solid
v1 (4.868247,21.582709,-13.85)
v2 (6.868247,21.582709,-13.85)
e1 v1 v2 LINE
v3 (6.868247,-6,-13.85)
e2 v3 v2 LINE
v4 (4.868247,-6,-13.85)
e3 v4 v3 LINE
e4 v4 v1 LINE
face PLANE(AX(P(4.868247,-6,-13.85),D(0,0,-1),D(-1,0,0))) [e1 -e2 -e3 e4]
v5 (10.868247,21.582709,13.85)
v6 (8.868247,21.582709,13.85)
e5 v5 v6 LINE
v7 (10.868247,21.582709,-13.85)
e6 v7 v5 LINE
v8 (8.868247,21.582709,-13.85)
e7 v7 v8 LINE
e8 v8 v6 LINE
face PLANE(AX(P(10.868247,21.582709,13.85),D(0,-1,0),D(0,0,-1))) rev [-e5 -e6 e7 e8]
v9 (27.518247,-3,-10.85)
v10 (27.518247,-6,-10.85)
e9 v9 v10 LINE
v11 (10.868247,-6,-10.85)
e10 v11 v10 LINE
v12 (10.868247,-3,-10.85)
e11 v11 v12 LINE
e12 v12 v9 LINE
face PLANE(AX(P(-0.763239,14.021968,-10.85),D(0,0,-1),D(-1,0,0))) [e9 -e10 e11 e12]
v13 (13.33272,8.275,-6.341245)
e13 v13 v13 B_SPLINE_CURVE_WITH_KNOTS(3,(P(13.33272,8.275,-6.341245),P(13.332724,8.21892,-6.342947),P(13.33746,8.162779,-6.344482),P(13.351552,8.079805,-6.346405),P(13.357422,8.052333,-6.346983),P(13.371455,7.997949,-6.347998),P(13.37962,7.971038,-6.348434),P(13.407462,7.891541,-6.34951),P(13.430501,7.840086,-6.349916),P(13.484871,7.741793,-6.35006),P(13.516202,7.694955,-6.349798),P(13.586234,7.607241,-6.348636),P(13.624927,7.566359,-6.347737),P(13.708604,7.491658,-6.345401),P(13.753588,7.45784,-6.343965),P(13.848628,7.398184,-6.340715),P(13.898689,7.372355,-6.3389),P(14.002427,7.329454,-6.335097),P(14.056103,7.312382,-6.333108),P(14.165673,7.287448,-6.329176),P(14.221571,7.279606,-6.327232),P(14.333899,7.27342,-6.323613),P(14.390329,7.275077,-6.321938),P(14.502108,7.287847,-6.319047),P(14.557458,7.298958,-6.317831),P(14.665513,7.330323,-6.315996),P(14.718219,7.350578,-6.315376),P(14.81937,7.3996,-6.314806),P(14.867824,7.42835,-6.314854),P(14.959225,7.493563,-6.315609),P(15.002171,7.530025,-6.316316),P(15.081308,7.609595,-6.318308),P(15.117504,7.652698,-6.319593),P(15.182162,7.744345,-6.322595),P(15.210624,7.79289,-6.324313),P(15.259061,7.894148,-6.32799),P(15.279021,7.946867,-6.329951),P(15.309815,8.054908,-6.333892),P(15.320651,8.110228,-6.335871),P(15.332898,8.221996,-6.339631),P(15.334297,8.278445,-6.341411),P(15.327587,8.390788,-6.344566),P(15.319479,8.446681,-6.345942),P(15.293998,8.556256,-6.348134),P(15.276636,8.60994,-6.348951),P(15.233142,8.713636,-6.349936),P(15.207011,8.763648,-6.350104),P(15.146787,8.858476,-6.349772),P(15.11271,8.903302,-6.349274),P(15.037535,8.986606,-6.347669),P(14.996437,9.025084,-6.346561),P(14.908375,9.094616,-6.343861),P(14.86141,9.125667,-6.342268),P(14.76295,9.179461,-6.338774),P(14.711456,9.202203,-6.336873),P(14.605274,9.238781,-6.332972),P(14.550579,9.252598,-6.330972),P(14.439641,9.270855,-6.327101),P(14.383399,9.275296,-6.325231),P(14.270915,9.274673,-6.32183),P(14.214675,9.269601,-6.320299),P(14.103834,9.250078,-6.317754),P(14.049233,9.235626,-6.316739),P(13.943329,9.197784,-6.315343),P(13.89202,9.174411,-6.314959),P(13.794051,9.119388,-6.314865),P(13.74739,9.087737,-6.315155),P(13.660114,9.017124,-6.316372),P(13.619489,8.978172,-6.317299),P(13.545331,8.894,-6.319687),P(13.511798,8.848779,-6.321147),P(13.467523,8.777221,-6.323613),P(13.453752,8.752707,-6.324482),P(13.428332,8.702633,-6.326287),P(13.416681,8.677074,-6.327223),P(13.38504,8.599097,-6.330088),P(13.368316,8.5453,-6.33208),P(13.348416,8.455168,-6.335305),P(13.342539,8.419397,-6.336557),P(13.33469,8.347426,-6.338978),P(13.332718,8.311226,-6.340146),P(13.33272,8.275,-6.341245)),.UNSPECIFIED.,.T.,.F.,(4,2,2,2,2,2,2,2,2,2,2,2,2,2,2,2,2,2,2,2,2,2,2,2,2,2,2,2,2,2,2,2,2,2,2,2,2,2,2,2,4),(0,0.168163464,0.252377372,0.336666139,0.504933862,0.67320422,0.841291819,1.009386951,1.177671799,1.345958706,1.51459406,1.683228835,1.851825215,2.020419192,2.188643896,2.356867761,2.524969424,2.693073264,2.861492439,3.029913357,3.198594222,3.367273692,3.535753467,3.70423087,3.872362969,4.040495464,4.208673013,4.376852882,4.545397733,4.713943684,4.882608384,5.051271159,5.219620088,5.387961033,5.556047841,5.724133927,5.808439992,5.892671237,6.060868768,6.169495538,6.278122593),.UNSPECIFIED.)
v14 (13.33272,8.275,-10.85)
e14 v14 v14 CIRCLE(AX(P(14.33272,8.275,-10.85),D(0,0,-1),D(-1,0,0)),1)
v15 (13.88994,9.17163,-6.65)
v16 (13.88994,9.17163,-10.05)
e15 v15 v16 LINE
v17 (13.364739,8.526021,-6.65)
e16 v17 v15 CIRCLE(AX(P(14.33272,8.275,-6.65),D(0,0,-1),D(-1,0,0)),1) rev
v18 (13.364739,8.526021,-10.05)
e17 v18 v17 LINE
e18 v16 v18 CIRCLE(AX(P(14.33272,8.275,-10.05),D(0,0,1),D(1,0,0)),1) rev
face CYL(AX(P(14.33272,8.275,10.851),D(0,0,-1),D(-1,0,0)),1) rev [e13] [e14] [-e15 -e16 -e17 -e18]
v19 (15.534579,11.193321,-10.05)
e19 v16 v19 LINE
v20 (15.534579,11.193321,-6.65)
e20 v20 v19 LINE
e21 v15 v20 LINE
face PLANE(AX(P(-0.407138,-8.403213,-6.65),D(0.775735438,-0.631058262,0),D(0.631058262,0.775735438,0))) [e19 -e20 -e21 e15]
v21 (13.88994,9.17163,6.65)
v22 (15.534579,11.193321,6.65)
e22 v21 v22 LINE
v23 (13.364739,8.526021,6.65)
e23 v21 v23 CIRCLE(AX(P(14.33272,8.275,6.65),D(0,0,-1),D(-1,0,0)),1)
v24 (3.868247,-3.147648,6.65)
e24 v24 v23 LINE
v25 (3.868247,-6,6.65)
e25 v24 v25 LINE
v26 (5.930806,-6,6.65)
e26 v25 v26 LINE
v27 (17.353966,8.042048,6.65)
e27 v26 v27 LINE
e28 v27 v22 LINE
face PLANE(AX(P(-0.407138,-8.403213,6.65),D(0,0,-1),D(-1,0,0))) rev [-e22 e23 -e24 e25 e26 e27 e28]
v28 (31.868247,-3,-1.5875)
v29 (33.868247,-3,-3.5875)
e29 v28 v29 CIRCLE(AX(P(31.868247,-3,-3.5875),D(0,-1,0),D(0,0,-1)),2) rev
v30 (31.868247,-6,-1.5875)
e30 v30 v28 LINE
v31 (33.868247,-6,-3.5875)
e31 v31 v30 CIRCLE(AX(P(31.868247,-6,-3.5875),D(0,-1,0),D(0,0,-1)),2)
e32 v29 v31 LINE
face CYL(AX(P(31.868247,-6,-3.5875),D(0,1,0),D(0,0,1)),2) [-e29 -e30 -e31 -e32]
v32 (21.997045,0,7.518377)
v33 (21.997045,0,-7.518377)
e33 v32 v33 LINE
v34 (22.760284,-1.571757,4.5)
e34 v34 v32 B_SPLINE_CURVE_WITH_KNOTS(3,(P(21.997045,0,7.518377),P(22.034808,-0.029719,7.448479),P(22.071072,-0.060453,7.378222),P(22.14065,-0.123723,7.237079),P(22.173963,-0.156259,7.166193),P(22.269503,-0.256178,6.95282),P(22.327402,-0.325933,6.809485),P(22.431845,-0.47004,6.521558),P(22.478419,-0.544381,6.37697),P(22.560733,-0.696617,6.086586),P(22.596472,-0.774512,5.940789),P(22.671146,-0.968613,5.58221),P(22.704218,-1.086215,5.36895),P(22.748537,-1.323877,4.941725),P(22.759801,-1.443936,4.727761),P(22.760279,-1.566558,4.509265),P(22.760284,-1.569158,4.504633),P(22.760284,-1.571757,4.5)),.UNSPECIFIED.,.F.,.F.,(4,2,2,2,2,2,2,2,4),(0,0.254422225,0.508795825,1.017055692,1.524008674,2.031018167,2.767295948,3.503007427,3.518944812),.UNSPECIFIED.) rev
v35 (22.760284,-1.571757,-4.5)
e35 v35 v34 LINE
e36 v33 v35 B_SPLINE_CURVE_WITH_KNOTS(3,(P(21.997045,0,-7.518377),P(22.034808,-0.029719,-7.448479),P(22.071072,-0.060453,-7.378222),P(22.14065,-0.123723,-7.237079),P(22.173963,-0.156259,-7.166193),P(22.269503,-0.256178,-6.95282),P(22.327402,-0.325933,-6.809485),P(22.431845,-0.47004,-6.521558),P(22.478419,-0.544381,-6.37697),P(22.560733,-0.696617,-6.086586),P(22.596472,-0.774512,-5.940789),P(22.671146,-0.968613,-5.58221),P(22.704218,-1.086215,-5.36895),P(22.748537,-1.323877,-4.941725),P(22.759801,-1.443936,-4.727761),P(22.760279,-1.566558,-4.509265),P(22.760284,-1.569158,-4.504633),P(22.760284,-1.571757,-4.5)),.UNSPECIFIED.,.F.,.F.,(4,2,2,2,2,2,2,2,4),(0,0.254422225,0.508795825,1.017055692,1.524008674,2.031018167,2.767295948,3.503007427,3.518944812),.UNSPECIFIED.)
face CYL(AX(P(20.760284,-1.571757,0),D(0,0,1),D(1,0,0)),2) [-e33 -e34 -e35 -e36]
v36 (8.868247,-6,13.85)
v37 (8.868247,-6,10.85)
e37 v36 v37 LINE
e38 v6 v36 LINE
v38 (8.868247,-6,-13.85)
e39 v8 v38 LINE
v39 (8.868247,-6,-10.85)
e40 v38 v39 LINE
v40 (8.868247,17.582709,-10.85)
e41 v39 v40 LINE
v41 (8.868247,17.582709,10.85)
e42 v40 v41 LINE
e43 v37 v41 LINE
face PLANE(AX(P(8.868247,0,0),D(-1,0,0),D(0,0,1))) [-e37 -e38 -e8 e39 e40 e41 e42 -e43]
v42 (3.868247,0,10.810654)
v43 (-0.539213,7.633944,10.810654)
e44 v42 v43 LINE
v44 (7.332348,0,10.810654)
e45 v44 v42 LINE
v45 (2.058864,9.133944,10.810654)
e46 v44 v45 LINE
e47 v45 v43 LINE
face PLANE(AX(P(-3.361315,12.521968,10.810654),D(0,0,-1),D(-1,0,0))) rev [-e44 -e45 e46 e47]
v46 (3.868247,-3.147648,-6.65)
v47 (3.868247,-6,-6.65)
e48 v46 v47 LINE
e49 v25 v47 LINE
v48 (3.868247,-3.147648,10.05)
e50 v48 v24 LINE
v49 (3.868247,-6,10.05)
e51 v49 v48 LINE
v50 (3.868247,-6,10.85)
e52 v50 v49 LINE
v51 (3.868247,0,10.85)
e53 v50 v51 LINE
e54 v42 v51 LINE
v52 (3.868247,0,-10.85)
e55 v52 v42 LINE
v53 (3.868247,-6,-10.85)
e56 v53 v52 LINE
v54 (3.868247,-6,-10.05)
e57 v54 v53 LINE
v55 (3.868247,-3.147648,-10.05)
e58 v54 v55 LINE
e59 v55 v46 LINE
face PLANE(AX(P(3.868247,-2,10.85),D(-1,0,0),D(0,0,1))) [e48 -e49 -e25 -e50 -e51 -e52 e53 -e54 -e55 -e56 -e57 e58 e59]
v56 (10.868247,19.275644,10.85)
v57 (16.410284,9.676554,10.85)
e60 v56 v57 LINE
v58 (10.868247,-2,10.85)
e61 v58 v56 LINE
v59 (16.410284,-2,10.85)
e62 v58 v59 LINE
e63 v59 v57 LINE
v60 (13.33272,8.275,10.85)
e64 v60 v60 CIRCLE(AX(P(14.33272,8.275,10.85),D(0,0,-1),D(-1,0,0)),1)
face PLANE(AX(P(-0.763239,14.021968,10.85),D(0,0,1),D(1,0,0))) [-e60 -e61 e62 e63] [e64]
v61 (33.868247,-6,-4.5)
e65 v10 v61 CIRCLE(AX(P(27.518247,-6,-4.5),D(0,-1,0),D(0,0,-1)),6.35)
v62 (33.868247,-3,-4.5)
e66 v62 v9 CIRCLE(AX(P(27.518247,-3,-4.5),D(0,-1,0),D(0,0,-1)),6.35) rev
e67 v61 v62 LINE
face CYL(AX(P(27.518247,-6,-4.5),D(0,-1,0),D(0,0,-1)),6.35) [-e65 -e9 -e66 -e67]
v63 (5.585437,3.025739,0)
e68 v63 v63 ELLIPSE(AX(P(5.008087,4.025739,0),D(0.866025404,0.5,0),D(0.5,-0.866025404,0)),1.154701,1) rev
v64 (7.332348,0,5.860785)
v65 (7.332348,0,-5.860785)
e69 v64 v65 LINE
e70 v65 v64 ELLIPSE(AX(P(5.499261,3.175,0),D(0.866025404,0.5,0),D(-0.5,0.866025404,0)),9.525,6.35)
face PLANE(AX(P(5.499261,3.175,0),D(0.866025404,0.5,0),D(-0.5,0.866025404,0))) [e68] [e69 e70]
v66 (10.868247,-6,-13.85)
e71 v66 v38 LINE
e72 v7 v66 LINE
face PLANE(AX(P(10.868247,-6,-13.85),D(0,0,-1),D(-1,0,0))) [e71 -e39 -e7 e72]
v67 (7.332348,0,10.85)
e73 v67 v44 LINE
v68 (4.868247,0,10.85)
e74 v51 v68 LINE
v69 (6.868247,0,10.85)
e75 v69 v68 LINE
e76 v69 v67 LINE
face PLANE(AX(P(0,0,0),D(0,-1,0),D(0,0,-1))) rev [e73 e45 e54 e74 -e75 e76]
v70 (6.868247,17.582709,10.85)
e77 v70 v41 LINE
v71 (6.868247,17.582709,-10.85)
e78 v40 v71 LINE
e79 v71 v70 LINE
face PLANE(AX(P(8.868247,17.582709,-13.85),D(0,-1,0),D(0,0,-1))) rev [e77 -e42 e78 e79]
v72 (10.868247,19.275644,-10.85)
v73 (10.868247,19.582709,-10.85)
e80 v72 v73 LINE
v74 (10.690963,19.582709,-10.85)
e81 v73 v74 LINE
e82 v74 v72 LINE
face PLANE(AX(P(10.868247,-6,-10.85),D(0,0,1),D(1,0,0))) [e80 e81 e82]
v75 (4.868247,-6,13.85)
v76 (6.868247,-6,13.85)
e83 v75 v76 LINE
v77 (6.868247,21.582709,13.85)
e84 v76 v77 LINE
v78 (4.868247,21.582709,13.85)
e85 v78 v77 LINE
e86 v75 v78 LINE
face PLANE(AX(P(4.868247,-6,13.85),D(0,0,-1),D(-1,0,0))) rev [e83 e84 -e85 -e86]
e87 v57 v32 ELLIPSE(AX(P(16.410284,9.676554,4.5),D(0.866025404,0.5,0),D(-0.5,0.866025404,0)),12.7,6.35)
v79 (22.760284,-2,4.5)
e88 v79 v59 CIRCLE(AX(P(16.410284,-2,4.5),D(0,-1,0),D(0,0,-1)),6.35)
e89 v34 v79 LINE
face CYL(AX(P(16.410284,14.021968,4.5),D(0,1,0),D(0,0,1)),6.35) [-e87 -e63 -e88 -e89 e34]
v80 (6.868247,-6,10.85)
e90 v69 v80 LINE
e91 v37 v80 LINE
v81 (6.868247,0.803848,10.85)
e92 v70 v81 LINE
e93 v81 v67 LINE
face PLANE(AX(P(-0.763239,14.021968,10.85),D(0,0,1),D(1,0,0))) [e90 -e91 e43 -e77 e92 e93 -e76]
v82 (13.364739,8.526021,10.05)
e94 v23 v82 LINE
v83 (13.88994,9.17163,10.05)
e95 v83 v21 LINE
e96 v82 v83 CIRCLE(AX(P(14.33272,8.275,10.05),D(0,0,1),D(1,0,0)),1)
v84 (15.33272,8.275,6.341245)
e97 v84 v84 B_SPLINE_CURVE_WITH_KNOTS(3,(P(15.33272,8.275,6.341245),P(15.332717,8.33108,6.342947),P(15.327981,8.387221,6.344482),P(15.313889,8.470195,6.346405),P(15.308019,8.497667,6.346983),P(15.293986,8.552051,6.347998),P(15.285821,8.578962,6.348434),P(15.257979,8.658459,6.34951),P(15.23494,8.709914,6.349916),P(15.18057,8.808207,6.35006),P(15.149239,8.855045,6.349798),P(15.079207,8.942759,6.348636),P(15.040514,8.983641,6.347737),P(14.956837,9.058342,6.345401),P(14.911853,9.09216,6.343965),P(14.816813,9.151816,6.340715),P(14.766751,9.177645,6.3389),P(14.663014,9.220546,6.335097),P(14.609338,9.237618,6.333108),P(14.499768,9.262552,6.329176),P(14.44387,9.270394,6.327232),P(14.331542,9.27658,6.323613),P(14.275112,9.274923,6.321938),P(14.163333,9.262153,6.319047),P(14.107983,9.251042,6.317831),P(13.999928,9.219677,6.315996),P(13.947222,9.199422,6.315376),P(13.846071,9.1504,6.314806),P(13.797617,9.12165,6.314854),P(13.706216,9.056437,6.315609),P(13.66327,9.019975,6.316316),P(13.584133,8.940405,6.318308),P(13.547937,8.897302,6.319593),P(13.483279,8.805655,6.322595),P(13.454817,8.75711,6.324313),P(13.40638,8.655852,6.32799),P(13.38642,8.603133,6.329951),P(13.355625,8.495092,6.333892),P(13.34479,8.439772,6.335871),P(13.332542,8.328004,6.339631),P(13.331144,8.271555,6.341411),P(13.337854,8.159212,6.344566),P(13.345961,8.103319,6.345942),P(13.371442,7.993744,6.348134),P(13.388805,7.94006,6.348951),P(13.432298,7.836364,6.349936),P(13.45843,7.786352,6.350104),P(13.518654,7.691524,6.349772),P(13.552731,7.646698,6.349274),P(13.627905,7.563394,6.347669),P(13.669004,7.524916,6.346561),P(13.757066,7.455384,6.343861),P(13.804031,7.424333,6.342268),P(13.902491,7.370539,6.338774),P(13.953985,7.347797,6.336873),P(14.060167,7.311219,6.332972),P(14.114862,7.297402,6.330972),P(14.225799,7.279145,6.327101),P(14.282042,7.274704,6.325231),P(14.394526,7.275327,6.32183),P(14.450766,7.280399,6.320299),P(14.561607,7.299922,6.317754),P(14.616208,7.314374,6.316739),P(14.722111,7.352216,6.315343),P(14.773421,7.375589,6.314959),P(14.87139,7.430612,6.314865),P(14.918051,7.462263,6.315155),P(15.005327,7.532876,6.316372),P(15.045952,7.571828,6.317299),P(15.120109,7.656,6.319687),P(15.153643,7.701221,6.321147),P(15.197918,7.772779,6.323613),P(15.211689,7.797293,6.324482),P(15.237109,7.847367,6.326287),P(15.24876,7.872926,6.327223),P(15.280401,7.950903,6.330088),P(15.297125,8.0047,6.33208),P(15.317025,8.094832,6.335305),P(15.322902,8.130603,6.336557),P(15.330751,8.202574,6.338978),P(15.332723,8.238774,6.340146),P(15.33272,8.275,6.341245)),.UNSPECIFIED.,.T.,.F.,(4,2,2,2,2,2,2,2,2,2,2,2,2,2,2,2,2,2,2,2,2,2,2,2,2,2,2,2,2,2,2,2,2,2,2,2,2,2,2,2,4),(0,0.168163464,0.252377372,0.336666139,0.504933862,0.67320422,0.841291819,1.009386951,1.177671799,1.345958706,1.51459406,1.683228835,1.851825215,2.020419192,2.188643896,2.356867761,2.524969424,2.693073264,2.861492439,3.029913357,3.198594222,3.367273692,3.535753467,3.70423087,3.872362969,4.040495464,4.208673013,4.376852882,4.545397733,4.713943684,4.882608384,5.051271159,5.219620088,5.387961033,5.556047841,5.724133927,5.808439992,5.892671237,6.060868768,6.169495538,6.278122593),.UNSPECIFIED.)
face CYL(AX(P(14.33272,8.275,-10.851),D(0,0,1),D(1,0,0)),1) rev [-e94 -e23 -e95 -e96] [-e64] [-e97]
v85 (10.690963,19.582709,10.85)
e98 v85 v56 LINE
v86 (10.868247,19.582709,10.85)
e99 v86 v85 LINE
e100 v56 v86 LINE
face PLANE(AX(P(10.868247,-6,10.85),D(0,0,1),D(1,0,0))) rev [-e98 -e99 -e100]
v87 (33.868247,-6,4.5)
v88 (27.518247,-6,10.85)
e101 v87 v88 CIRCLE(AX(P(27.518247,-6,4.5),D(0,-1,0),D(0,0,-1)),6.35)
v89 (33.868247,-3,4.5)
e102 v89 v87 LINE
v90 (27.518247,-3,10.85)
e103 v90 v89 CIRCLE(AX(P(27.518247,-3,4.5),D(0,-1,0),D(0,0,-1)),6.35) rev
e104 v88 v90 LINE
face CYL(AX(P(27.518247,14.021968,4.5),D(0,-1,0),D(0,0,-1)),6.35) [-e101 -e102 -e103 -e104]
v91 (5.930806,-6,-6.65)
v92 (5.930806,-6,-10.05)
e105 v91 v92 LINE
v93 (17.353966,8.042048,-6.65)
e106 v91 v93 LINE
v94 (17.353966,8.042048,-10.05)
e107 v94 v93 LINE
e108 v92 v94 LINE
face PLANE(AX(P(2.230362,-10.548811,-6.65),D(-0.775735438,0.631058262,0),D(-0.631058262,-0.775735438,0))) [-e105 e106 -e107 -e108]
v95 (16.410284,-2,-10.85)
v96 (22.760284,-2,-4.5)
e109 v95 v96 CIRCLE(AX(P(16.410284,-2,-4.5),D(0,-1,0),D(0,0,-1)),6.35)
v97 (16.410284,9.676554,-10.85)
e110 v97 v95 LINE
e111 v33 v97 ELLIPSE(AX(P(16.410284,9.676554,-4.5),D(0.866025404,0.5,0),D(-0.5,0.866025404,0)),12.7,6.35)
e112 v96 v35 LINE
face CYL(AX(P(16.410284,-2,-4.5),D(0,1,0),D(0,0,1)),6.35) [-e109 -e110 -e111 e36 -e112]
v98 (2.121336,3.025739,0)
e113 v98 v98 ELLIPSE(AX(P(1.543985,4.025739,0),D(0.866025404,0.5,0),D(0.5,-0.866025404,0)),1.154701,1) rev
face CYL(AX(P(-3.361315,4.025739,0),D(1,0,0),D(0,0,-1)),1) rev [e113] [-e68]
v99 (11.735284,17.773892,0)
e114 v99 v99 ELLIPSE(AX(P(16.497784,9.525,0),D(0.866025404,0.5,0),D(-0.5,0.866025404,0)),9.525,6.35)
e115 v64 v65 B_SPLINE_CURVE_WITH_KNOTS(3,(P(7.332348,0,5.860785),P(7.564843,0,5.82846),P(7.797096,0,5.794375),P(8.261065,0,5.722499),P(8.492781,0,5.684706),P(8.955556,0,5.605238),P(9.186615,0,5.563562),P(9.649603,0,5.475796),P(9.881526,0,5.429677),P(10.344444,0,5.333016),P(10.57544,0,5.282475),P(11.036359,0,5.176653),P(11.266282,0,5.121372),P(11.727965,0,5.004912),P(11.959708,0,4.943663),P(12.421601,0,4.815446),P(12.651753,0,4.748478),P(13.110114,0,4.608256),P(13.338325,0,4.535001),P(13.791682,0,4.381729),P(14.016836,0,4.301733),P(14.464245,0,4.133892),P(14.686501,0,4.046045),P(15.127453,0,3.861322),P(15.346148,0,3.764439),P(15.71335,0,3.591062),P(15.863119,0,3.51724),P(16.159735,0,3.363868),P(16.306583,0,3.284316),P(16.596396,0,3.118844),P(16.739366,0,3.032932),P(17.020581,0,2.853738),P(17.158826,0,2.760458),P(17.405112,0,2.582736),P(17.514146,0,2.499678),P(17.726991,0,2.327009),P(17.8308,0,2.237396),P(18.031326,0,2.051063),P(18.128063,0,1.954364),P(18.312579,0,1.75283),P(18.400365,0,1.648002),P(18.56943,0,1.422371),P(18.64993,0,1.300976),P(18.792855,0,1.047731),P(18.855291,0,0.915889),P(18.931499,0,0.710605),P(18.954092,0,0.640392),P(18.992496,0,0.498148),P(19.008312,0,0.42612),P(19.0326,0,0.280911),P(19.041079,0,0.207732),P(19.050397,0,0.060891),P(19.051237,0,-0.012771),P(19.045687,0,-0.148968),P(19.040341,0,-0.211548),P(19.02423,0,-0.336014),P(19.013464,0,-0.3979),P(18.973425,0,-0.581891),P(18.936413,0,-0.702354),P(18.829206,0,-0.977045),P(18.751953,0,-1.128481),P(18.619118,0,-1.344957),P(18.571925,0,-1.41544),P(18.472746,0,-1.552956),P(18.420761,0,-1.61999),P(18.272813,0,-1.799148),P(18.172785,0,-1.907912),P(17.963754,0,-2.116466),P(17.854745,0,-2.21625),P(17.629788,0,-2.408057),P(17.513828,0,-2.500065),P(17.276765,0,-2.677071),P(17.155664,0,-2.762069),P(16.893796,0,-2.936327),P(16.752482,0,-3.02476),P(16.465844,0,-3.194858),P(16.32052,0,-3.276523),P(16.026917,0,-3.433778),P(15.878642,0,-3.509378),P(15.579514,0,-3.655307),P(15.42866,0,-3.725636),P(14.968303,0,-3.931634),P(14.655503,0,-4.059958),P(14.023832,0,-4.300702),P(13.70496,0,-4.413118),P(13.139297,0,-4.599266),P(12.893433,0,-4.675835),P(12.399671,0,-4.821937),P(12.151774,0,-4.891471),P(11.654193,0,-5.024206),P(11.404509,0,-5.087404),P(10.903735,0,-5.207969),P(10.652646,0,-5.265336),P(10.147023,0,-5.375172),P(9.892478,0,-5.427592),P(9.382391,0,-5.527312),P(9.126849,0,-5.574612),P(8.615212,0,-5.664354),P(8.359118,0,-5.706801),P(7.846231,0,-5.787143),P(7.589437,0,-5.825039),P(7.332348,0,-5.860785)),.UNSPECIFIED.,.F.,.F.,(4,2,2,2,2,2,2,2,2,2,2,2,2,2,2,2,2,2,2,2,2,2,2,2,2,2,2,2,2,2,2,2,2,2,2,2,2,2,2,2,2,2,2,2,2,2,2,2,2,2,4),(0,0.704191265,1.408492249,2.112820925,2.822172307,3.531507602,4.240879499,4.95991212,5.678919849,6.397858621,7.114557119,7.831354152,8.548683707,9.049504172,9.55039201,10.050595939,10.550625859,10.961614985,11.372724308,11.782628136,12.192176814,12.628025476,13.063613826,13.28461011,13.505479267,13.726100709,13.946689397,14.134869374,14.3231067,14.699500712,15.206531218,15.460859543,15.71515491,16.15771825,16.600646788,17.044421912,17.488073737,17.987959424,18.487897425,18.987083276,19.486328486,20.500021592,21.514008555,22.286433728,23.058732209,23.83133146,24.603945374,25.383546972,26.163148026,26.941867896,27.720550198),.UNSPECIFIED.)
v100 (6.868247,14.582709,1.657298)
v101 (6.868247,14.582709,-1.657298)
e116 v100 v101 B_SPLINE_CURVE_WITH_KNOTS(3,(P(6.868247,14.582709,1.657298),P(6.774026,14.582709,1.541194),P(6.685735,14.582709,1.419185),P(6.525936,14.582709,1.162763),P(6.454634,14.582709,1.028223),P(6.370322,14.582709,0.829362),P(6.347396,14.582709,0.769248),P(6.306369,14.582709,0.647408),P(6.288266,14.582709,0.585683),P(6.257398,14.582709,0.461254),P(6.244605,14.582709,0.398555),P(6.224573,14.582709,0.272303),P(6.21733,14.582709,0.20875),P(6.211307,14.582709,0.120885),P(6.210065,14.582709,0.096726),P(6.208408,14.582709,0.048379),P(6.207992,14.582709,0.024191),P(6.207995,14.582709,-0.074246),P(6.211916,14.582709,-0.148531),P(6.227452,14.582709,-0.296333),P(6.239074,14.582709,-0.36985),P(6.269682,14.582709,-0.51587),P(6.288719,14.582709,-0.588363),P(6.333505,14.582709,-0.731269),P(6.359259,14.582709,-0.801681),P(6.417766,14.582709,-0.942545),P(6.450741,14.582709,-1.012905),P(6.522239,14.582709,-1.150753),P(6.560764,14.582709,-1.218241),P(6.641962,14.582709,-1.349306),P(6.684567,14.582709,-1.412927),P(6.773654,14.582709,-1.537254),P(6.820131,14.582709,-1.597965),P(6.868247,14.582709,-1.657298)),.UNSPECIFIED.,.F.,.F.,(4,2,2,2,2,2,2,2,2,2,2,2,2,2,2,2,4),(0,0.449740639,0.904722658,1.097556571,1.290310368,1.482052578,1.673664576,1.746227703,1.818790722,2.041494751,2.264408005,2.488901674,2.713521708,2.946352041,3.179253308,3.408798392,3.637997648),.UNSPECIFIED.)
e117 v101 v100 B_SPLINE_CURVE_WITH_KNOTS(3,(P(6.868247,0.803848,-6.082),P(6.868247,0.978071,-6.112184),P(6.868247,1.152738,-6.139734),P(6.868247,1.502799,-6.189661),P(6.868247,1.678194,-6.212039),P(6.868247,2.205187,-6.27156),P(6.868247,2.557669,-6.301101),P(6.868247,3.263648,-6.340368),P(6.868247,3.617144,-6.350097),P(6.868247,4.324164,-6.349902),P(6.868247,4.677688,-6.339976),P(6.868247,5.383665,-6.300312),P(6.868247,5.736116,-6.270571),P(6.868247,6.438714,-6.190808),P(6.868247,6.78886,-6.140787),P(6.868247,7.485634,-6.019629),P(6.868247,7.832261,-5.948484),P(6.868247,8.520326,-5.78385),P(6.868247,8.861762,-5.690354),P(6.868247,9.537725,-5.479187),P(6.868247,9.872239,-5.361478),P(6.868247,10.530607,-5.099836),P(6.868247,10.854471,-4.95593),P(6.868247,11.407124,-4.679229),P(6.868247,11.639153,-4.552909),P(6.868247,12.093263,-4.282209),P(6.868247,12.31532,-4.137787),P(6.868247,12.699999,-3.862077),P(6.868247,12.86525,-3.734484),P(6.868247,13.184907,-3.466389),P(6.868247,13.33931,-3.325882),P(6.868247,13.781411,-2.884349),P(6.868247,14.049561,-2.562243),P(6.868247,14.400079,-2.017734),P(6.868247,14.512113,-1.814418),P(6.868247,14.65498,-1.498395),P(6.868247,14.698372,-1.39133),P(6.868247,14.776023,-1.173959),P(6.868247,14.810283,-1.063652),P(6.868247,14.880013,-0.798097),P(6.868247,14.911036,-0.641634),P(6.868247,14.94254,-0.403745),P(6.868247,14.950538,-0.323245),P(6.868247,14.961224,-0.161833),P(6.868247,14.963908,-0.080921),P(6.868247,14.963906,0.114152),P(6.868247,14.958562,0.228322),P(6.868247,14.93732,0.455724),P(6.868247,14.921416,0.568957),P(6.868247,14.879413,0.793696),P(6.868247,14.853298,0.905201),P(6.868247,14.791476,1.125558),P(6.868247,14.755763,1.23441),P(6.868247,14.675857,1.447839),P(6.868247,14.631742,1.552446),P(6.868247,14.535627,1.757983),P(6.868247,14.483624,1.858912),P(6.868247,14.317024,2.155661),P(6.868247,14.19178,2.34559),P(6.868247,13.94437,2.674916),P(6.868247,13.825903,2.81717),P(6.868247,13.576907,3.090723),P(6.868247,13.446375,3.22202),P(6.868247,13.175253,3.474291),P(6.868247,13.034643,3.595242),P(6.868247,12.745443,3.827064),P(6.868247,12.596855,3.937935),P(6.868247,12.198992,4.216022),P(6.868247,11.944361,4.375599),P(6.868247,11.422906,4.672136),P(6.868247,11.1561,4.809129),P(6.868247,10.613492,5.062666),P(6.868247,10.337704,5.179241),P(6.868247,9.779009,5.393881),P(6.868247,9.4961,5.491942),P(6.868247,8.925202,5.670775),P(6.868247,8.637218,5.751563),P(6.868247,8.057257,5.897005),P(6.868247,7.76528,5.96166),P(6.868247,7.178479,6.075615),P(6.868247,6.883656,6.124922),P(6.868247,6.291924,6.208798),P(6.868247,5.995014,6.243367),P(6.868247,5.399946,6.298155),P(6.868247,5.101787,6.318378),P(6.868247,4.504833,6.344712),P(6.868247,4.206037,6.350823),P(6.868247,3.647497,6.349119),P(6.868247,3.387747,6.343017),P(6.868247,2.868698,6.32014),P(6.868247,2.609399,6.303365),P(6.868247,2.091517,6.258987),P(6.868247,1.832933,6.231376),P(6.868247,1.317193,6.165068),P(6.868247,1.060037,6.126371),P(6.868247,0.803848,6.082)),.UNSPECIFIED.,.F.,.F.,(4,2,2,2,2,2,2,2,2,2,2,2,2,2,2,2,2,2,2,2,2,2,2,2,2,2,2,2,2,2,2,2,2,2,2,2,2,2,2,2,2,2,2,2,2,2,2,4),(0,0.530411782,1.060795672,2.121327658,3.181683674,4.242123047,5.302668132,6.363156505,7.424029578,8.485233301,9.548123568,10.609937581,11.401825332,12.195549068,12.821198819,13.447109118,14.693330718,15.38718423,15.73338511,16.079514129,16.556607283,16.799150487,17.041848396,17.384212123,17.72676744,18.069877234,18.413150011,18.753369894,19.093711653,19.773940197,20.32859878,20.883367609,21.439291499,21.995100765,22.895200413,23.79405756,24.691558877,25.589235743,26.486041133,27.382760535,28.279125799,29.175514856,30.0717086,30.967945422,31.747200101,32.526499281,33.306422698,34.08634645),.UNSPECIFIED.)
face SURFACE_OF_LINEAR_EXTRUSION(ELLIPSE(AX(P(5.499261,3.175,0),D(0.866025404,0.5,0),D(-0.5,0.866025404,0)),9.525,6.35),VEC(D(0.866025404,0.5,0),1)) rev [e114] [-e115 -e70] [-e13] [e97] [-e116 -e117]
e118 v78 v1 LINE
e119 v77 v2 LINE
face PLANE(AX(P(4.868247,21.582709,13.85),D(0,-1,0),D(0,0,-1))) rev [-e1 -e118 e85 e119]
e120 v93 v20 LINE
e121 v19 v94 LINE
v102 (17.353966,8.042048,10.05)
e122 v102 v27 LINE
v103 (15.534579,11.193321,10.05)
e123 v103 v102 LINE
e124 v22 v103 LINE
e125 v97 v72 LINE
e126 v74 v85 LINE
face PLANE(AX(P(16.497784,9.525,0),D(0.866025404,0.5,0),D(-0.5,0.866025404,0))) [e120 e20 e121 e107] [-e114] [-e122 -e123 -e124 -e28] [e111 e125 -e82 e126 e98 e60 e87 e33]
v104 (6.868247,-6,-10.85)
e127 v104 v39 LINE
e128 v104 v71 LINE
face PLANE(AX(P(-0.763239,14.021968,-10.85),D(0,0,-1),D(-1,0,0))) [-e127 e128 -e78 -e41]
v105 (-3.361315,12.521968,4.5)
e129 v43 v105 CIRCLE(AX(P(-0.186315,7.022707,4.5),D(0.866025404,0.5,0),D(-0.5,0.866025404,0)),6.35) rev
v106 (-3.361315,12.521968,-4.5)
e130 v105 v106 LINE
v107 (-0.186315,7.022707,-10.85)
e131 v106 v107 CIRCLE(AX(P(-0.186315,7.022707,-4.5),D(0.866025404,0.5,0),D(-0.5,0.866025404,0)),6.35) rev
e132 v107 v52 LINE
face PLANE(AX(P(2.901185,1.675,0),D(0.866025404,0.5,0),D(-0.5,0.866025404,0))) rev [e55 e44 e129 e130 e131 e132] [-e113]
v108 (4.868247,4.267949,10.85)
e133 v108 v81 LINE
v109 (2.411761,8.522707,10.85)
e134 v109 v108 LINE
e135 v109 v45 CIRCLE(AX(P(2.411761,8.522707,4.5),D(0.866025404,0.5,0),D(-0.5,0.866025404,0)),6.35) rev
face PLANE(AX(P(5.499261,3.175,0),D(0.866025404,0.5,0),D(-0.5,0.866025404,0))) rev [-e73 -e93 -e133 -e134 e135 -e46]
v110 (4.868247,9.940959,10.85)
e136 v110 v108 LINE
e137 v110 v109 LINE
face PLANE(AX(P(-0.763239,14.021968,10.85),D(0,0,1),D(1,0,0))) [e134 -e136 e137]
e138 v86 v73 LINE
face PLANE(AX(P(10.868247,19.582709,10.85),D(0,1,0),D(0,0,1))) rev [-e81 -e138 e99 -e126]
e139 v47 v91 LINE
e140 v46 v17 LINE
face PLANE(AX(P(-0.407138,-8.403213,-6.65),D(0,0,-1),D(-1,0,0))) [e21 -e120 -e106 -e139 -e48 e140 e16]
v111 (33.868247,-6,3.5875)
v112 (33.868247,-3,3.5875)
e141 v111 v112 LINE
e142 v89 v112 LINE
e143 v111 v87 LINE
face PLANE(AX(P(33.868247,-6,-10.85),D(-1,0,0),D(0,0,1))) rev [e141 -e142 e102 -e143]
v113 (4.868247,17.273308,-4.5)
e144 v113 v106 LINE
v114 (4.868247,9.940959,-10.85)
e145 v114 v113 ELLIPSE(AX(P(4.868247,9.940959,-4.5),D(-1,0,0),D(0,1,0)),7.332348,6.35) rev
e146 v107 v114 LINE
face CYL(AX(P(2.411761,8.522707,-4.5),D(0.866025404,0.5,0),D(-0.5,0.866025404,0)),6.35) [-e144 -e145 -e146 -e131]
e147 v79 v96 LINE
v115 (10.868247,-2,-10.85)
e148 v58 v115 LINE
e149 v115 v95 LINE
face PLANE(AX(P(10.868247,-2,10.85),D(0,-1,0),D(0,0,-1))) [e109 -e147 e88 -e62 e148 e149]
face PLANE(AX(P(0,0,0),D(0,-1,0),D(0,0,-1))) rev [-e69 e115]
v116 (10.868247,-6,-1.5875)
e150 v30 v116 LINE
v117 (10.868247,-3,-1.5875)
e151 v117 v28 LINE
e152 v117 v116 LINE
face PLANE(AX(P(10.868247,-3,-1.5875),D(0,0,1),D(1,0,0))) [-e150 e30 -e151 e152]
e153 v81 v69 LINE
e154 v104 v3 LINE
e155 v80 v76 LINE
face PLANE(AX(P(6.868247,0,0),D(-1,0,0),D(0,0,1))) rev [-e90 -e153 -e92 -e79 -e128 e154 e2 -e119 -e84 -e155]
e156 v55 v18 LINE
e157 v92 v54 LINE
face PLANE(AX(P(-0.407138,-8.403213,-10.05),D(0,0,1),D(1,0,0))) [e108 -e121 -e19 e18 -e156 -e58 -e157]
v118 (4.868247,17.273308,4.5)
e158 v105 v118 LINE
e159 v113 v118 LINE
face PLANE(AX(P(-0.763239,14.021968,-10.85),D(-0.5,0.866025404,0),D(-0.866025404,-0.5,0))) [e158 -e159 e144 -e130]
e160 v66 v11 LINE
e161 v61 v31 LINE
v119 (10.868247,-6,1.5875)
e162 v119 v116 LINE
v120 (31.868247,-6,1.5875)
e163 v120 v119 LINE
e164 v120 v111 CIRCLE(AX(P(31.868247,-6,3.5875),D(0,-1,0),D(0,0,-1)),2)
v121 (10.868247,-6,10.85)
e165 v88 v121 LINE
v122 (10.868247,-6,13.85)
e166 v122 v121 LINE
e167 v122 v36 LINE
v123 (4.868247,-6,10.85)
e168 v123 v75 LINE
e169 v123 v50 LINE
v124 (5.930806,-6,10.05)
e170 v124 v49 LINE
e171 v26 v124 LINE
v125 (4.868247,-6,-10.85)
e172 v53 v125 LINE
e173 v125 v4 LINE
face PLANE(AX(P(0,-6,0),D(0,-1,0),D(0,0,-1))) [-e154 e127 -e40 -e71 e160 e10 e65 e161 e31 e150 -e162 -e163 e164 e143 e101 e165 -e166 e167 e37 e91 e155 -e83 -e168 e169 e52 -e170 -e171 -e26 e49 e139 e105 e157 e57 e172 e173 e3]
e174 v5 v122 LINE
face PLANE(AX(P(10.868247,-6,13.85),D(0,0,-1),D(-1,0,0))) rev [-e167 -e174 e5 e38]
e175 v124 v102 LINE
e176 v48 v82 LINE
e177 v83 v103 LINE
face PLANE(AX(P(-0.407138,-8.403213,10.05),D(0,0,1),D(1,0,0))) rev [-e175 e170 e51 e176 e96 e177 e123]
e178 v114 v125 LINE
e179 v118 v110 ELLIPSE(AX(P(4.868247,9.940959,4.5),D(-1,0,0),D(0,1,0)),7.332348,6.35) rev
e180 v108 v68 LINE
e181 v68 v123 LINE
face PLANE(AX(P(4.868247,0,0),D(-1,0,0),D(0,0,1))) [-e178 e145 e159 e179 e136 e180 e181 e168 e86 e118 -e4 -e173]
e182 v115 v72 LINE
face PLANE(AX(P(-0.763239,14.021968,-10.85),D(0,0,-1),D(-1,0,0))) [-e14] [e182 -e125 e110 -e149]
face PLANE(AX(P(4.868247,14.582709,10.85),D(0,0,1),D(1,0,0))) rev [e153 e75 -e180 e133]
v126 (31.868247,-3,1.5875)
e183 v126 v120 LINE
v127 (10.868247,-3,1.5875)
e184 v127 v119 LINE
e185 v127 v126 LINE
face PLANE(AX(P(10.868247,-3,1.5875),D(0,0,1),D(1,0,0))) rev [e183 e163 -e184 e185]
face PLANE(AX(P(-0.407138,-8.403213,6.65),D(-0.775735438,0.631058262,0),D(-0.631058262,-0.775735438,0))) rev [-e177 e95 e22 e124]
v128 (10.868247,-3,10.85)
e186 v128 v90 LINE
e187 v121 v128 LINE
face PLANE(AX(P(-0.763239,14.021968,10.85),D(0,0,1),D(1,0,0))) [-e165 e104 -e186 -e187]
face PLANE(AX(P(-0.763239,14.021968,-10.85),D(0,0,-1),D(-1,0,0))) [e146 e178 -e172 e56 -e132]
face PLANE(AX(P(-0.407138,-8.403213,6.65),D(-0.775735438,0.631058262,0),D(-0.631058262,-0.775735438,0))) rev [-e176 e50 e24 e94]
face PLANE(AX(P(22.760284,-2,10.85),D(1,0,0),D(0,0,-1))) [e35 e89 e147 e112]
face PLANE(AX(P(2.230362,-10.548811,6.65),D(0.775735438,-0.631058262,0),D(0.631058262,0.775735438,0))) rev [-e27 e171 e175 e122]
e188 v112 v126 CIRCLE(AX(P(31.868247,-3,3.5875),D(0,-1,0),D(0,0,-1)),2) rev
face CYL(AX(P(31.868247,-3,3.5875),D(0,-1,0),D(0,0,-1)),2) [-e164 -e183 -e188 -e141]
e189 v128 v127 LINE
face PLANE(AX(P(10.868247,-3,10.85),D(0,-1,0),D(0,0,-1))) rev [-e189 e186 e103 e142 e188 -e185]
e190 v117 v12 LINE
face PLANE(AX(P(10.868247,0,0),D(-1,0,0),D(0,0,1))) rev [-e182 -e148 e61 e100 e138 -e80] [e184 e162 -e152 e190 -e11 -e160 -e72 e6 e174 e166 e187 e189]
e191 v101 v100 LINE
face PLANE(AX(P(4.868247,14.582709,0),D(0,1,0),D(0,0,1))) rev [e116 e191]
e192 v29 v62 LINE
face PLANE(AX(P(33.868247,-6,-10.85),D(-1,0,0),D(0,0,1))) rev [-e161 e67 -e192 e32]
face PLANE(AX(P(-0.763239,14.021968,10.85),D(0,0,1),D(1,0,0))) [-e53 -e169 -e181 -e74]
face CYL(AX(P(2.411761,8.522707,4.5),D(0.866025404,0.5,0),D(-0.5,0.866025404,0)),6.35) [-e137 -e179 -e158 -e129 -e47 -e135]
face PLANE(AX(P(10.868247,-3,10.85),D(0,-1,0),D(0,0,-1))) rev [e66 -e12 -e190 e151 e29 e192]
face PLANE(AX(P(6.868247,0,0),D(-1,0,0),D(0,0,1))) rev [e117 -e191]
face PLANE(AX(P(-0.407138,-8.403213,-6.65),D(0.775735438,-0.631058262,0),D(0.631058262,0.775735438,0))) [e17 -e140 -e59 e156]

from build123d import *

# Parameters (mm, degrees)
SKETCH2_W           = 21.7
SKETCH2_H           = 25.05
SKETCH2_RX          = 9.525
SKETCH2_RY          = 6.35
BOSS_EXTRUDE1_DEPTH = 12.7
SKETCH3_W           = 21.660653916
SKETCH3_H           = 25.05
BOSS_EXTRUDE2_DEPTH = 3
SKETCH5_W           = 18.892037138
SKETCH5_H           = 21.7
BOSS_EXTRUDE3_DEPTH = 2
SKETCH6_W           = 30
SKETCH6_H           = 21.7
BOSS_EXTRUDE4_DEPTH = 4
SKETCH7_W           = 21.7
SKETCH7_H           = 1
SKETCH7_W_2         = 3.175
SKETCH7_H_2         = 3
CUT_EXTRUDE2_DEPTH  = 23
SKETCH7_3_W         = 21.7
SKETCH7_3_H         = 7.272473706
CUT_EXTRUDE3_DEPTH  = 44.803879418
SKETCH11_R          = 1
CUT_EXTRUDE8_DEPTH  = 33.487034031
CUT_EXTRUDE4_REACH  = 47.088
SKETCH9_R           = 1
SKETCH15_W          = 3.4
SKETCH15_H          = 3.4
CUT_EXTRUDE9_DEPTH  = 28.443249332
BOSS_EXTRUDE5_DEPTH = 2
BOSS_EXTRUDE6_DEPTH = 2
FILLET5_R           = 6.35
FILLET6_R           = 2
FILLET7_R           = 2
SKETCH19_W          = 2
SKETCH19_H          = 4
CUT_EXTRUDE10_DEPTH = 48.148292291


with BuildPart() as part:
    # Sketch2 → Boss-Extrude1 (new body)
    with BuildSketch(Plane(origin=(16.497783942, 9.525, 0), x_dir=(0, 0, -1), z_dir=(0.8660254037844379, 0.5000000000000013, 0))):
        Rectangle(SKETCH2_W, SKETCH2_H)
        with Locations(Location((0, 0), (0, 0, 90))):
            Ellipse(SKETCH2_RX, SKETCH2_RY, mode=Mode.SUBTRACT)
    extrude(amount=-BOSS_EXTRUDE1_DEPTH)

    # Sketch3 → Boss-Extrude2 (add)
    with BuildSketch(Plane(origin=(5.499261314, 3.175, 0), x_dir=(0, 0, 1), z_dir=(-0.8660254037844379, -0.5000000000000014, 0))):
        with Locations((-0.019673042, 0)):
            Rectangle(SKETCH3_W, SKETCH3_H)
    extrude(amount=BOSS_EXTRUDE2_DEPTH)

    # Sketch5 → Boss-Extrude3 (add)
    with BuildSketch(Plane(origin=(0, 0, 0), x_dir=(-1, 0, 0), z_dir=(0, 1, 0))):
        with Locations((-13.314265373, 0)):
            Rectangle(SKETCH5_W, SKETCH5_H)
    extrude(amount=-BOSS_EXTRUDE3_DEPTH)

    # Sketch6 → Boss-Extrude4 (add)
    with BuildSketch(Plane.XZ.offset(2)):
        with Locations((18.868246804, 0)):
            Rectangle(SKETCH6_W, SKETCH6_H)
    extrude(amount=BOSS_EXTRUDE4_DEPTH)

    # Sketch7 → Cut-Extrude2 (cut)
    with BuildSketch(Plane(origin=(33.868246804, 0, 0), x_dir=(0, 0, -1), z_dir=(1, 0, 0))):
        with Locations((0, -2.5)):
            Rectangle(SKETCH7_W, SKETCH7_H)
        with Locations((0, -4.5)):
            Rectangle(SKETCH7_W_2, SKETCH7_H_2)
    extrude(amount=-CUT_EXTRUDE2_DEPTH, mode=Mode.SUBTRACT)

    # Sketch7<3> → Cut-Extrude3 (cut, through all)
    with BuildSketch(Plane(origin=(33.868246804, 0, 0), x_dir=(0, 0, -1), z_dir=(1, 0, 0))):
        with Locations((0, -9.636236853)):
            Rectangle(SKETCH7_3_W, SKETCH7_3_H)
    extrude(amount=-CUT_EXTRUDE3_DEPTH, mode=Mode.SUBTRACT)

    # Sketch11 → Cut-Extrude8 (cut, through all)
    with BuildSketch(Plane(origin=(19.672783942, 0.194872981, 0), x_dir=(0, 0, -1), z_dir=(-1, 0, 0))):
        with Locations(Location((0, -3.830865705, 0), (0, 0, 90))):
            Circle(SKETCH11_R)
    extrude(amount=CUT_EXTRUDE8_DEPTH, mode=Mode.SUBTRACT)

    # Sketch9 → Cut-Extrude4 (cut, up to next)
    with BuildSketch(Plane(origin=(0, 0, -10.85), x_dir=(-1, 0, 0), z_dir=(0, 0, -1)), mode=Mode.PRIVATE) as cut_extrude4_sk1:
        with Locations((-14.332720433, 8.275)):
            Circle(SKETCH9_R)
    cut_extrude4_tool1 = extrude(cut_extrude4_sk1.sketch, amount=-CUT_EXTRUDE4_REACH, mode=Mode.PRIVATE) & part.part
    cut_extrude4 = cut_extrude4_tool1.solids().sort_by_distance((14.33272, 8.275, -10.85))[0]
    add(cut_extrude4, mode=Mode.SUBTRACT)

    # Sketch15 → Cut-Extrude9 (cut, symmetric)
    with BuildSketch(Plane(origin=(16.497783942, 9.525, 0), x_dir=(0.7757354378747654, -0.6310582623064579, 0), z_dir=(0.6310582623064579, 0.7757354378747654, 0))):
        with Locations((-0.1, -8.35)):
            Rectangle(SKETCH15_W, SKETCH15_H)
    cut_extrude9 = extrude(amount=CUT_EXTRUDE9_DEPTH, both=True, mode=Mode.SUBTRACT)

    # Sketch16 → Boss-Extrude5 (add)
    with BuildSketch(Plane(origin=(8.868246804, 0, 0), x_dir=(0, 0, -1), z_dir=(1, 0, 0))):
        Polygon((-10.85, -6), (-10.85, 19.582708922), (0, 19.582708922), (0, 21.582708922), (-13.85, 21.582708922), (-13.85, -6), align=None)
    boss_extrude5 = extrude(amount=BOSS_EXTRUDE5_DEPTH)

    # Sketch18 → Boss-Extrude6 (add)
    with BuildSketch(Plane.ZY.offset(-6.868246804)):
        Polygon((10.85, -6), (13.85, -6), (13.85, 21.582708922), (0, 21.582708922), (0, 14.582708922), (10.85, 14.582708922), align=None)
    boss_extrude6 = extrude(amount=BOSS_EXTRUDE6_DEPTH)

    # Mirror1: Cut-Extrude4, Cut-Extrude9, Boss-Extrude5, Boss-Extrude6 across plane
    add(cut_extrude4.mirror(Plane.XY), mode=Mode.SUBTRACT)
    add(cut_extrude9.mirror(Plane.XY), mode=Mode.SUBTRACT)
    add(boss_extrude5.mirror(Plane.XY))
    add(boss_extrude6.mirror(Plane.XY))

    # Fillet5
    fillet5_edges = [part.edges().sort_by_distance(p)[0] for p in [
        (22.760283942, -1, 10.85),
        (22.760283942, -1, -10.85),
        (0.753465953, 14.897638014, -10.85),
        (2.052504059, 15.647638014, 10.85),
        (33.868246804, -4.5, -10.85),
        (33.868246804, -4.5, 10.85),
    ]]
    fillet(fillet5_edges, radius=FILLET5_R)

    # Fillet6
    fillet6_edges = [part.edges().sort_by_distance(p)[0] for p in [
        (33.868246804, -4.5, 1.5875),
        (33.868246804, -4.5, -1.5875),
    ]]
    fillet(fillet6_edges, radius=FILLET6_R)

    # Fillet7
    # the kernel refuses this fillet: 2 mm, written as the material it takes off along each edge
    with BuildSketch(Plane(origin=(22.760283942, 0, 8.429393602), x_dir=(0, -1, 0), z_dir=(0, 0, -1))) as fillet7_piece_1:
        with BuildLine():
            CenterArc((1.571757441, 2), FILLET7_R, 218.197977663, 51.802022337)
            Line((0, 0.763238686), (-0.031435149, 0.73850346))
            ThreePointArc((-0.031435149, 0.73850346), (-0.04, 0.381619343), (-0.04, 0))
            Line((-0.04, 0), (0, -0.04))
            Line((0, -0.04), (1.571757441, -0.04))
            Line((1.571757441, -0.04), (1.571757441, 0))
        make_face()
    extrude(amount=16.858787203, mode=Mode.SUBTRACT)

    # Sketch19 → Cut-Extrude10 (cut, through all)
    with BuildSketch(Plane.XY.offset(10.85)):
        with Locations((7.868246804, 19.582708922)):
            Rectangle(SKETCH19_W, SKETCH19_H)
    extrude(amount=-CUT_EXTRUDE10_DEPTH, mode=Mode.SUBTRACT)


solid = part.part
